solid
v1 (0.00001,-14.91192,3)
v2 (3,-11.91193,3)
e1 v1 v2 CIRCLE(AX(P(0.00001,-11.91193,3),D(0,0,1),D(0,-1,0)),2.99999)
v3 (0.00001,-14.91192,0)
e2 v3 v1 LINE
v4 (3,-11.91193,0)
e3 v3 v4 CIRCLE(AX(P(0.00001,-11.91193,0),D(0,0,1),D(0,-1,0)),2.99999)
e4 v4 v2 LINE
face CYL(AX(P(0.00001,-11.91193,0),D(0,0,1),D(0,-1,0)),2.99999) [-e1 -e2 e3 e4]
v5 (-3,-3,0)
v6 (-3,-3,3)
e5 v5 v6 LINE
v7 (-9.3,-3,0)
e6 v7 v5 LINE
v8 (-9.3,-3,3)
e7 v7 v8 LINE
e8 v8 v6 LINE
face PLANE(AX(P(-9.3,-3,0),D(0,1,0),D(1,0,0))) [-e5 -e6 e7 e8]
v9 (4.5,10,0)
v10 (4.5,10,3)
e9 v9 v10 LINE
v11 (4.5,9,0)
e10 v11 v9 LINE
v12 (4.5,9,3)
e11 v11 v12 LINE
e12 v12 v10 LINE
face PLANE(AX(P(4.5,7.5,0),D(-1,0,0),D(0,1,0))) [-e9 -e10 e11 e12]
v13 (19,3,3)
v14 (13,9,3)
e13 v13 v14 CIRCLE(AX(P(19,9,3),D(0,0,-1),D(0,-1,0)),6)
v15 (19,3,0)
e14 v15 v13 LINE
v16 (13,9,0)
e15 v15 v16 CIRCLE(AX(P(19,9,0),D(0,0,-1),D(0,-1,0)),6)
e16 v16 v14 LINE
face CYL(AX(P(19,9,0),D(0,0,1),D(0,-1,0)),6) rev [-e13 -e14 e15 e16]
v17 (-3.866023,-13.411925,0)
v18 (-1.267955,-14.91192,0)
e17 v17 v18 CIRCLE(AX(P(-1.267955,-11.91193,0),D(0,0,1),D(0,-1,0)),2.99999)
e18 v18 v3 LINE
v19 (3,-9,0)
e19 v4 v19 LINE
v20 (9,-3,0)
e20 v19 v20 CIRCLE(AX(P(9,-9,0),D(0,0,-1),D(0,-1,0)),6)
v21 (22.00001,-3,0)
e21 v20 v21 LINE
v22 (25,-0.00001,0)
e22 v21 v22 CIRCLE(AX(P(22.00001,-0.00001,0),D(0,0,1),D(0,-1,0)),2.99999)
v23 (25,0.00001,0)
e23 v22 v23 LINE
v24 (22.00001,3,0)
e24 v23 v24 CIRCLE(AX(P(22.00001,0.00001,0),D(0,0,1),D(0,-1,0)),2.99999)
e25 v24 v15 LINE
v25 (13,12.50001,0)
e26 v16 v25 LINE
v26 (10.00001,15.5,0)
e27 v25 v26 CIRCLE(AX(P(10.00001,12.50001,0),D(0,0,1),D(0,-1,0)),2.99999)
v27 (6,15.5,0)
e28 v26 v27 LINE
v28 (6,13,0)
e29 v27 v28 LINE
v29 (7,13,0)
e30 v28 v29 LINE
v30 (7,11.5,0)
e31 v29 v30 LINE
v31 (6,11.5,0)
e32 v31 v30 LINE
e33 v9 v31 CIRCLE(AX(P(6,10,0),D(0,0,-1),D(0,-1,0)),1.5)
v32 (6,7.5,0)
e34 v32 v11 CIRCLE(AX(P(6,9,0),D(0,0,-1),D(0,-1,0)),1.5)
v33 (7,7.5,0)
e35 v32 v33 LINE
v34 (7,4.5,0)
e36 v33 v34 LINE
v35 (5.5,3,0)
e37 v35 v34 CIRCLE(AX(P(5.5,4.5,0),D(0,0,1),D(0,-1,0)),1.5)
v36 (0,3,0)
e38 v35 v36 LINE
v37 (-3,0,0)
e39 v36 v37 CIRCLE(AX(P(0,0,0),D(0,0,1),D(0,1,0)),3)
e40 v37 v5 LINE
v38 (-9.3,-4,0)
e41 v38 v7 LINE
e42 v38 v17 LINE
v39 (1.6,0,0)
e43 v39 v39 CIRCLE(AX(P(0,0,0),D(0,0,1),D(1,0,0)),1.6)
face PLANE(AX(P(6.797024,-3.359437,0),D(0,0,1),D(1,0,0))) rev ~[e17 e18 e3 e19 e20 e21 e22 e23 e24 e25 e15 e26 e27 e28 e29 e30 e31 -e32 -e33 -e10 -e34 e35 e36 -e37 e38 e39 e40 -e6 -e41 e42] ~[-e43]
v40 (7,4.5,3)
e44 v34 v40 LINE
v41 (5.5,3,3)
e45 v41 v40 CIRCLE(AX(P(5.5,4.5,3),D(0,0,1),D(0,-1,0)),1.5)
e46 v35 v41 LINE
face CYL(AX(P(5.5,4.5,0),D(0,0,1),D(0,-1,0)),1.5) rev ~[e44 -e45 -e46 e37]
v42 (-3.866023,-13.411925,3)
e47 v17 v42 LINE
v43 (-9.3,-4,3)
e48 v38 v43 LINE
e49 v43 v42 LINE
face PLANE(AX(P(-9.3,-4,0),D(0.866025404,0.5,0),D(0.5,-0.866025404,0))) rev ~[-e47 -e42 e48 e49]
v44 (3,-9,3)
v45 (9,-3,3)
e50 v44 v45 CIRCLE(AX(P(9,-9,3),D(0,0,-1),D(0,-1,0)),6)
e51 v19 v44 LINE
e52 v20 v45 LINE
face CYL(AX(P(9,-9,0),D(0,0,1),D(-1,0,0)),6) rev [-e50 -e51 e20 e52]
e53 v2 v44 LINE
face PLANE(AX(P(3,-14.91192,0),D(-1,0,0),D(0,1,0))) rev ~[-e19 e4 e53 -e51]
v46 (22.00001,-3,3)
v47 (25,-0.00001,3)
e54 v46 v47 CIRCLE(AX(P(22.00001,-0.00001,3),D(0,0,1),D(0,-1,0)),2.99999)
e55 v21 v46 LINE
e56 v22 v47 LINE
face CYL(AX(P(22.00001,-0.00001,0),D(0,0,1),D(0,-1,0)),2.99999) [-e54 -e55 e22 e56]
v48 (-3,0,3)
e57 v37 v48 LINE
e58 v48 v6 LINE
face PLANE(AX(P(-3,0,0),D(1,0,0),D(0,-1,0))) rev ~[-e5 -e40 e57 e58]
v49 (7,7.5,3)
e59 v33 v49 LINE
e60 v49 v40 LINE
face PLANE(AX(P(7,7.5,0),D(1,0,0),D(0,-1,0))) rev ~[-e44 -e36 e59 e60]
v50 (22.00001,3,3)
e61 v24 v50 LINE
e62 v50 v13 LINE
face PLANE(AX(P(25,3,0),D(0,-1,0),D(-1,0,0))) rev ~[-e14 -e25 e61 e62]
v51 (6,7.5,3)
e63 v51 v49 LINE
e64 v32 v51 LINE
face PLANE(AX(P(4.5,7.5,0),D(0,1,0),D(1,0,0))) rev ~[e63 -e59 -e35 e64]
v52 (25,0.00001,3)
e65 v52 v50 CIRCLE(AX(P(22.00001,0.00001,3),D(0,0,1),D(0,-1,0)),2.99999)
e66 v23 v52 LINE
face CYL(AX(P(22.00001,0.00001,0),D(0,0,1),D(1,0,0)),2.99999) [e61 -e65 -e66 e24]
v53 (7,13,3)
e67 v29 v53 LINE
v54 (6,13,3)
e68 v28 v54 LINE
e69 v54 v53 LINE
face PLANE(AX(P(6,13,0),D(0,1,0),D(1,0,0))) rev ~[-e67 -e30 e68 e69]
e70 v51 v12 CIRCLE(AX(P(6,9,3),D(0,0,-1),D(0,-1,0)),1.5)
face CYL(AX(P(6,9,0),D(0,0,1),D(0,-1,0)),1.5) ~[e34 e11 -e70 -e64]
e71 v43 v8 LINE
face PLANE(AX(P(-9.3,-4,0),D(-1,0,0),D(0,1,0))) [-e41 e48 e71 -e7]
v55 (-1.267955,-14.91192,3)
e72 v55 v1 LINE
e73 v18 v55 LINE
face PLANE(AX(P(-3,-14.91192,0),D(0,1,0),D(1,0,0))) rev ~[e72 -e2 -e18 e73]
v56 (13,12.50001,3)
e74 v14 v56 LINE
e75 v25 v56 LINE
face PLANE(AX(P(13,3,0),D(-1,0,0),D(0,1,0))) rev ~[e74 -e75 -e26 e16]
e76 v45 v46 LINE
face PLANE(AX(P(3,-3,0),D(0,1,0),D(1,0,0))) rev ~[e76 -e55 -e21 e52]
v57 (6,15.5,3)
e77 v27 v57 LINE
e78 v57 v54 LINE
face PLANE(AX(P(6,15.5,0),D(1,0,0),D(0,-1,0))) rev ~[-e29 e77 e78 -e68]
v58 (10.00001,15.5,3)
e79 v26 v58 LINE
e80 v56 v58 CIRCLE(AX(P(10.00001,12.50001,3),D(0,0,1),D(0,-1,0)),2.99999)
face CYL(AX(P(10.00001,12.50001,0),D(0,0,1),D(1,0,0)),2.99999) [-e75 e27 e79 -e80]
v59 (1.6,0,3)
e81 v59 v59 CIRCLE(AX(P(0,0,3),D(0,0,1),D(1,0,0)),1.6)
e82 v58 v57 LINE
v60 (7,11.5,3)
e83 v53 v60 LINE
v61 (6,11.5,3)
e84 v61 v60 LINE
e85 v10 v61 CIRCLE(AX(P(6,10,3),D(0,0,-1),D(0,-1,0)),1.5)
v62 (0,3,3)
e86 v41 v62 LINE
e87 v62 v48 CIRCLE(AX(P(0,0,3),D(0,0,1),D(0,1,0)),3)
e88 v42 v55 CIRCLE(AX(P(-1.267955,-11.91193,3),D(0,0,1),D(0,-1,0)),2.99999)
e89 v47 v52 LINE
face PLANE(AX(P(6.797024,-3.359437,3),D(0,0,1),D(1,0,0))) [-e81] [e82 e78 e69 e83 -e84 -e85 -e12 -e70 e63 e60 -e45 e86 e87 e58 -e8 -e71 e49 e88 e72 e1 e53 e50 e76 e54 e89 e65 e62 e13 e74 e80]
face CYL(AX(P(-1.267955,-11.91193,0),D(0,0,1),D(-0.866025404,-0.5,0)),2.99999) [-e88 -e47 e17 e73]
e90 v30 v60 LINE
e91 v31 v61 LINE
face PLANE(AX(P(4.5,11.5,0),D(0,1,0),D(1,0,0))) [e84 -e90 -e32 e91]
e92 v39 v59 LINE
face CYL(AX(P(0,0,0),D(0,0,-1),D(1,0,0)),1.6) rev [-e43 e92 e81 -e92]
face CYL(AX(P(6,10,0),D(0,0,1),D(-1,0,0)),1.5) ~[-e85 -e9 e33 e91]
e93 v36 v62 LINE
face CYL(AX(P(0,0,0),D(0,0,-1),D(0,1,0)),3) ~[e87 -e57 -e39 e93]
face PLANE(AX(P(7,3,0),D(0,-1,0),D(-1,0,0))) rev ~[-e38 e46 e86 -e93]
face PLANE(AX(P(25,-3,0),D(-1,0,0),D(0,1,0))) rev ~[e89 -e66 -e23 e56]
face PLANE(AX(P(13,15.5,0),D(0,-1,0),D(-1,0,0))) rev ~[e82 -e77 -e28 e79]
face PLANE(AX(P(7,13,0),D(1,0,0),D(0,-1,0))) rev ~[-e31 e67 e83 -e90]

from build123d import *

# Parameters (mm, degrees)
F0_R     = 1.6
F0_W     = 6.3
F0_H     = 1
F0_W_2   = 2.5
F0_H_2   = 4
F1_DEPTH = 3
F2_R     = 2.99999
F3_R     = 6
F4_R     = 1.5


# Not quite as in the source:
# - a fillet or chamfer is up to 0.001 mm smaller than in the source, because OpenCascade refuses the exact size


with BuildPart() as f1:
    # F0 (on Top) → F1 (new body)
    with BuildSketch(Plane.XY):
        with BuildLine():
            ThreePointArc((0, 3), (-2.1213203436, 2.1213203436), (-3, 0))
            Line((-3, 0), (-3, -3))
            Line((-3, -3), (-3, -4))
            Line((-3, -4), (-9.3, -4))
            Line((-9.3, -4), (-3, -14.9119200877))
            Line((-3, -14.9119200877), (3, -14.9119200877))
            Line((3, -14.9119200877), (3, -3))
            Line((3, -3), (25, -3))
            Line((25, -3), (25, 3))
            Line((25, 3), (13, 3))
            Line((13, 3), (7, 3))
            Line((7, 3), (0, 3))
        make_face()
        Circle(F0_R, mode=Mode.SUBTRACT)
        with Locations((-6.15, -3.5)):
            Rectangle(F0_W, F0_H)
        Polygon((7, 7.5), (7, 3), (13, 3), (13, 13), (7, 13), (7, 11.5), align=None)
        with Locations((5.75, 9.5)):
            Rectangle(F0_W_2, F0_H_2)
        Polygon((7, 13), (13, 13), (13, 15.5), (6, 15.5), (6, 13), align=None)
    extrude(amount=F1_DEPTH)

    # F2 (radius 3 in the source; OpenCascade refuses exactly that, so slightly less here)
    f2_edges = [f1.edges().sort_by_distance(p)[0] for p in [
        (-3, -14.91192, 1.5),
        (3, -14.91192, 1.5),
        (25, -3, 1.5),
        (25, 3, 1.5),
        (13, 15.5, 1.5),
    ]]
    fillet(f2_edges, radius=F2_R)

    # F3
    f3_edges = [f1.edges().sort_by_distance(p)[0] for p in [
        (3, -3, 1.5),
        (13, 3, 1.5),
    ]]
    fillet(f3_edges, radius=F3_R)

    # F4
    f4_edges = [f1.edges().sort_by_distance(p)[0] for p in [
        (4.5, 11.5, 1.5),
        (4.5, 7.5, 1.5),
        (7, 3, 1.5),
    ]]
    fillet(f4_edges, radius=F4_R)


solid = f1.part
